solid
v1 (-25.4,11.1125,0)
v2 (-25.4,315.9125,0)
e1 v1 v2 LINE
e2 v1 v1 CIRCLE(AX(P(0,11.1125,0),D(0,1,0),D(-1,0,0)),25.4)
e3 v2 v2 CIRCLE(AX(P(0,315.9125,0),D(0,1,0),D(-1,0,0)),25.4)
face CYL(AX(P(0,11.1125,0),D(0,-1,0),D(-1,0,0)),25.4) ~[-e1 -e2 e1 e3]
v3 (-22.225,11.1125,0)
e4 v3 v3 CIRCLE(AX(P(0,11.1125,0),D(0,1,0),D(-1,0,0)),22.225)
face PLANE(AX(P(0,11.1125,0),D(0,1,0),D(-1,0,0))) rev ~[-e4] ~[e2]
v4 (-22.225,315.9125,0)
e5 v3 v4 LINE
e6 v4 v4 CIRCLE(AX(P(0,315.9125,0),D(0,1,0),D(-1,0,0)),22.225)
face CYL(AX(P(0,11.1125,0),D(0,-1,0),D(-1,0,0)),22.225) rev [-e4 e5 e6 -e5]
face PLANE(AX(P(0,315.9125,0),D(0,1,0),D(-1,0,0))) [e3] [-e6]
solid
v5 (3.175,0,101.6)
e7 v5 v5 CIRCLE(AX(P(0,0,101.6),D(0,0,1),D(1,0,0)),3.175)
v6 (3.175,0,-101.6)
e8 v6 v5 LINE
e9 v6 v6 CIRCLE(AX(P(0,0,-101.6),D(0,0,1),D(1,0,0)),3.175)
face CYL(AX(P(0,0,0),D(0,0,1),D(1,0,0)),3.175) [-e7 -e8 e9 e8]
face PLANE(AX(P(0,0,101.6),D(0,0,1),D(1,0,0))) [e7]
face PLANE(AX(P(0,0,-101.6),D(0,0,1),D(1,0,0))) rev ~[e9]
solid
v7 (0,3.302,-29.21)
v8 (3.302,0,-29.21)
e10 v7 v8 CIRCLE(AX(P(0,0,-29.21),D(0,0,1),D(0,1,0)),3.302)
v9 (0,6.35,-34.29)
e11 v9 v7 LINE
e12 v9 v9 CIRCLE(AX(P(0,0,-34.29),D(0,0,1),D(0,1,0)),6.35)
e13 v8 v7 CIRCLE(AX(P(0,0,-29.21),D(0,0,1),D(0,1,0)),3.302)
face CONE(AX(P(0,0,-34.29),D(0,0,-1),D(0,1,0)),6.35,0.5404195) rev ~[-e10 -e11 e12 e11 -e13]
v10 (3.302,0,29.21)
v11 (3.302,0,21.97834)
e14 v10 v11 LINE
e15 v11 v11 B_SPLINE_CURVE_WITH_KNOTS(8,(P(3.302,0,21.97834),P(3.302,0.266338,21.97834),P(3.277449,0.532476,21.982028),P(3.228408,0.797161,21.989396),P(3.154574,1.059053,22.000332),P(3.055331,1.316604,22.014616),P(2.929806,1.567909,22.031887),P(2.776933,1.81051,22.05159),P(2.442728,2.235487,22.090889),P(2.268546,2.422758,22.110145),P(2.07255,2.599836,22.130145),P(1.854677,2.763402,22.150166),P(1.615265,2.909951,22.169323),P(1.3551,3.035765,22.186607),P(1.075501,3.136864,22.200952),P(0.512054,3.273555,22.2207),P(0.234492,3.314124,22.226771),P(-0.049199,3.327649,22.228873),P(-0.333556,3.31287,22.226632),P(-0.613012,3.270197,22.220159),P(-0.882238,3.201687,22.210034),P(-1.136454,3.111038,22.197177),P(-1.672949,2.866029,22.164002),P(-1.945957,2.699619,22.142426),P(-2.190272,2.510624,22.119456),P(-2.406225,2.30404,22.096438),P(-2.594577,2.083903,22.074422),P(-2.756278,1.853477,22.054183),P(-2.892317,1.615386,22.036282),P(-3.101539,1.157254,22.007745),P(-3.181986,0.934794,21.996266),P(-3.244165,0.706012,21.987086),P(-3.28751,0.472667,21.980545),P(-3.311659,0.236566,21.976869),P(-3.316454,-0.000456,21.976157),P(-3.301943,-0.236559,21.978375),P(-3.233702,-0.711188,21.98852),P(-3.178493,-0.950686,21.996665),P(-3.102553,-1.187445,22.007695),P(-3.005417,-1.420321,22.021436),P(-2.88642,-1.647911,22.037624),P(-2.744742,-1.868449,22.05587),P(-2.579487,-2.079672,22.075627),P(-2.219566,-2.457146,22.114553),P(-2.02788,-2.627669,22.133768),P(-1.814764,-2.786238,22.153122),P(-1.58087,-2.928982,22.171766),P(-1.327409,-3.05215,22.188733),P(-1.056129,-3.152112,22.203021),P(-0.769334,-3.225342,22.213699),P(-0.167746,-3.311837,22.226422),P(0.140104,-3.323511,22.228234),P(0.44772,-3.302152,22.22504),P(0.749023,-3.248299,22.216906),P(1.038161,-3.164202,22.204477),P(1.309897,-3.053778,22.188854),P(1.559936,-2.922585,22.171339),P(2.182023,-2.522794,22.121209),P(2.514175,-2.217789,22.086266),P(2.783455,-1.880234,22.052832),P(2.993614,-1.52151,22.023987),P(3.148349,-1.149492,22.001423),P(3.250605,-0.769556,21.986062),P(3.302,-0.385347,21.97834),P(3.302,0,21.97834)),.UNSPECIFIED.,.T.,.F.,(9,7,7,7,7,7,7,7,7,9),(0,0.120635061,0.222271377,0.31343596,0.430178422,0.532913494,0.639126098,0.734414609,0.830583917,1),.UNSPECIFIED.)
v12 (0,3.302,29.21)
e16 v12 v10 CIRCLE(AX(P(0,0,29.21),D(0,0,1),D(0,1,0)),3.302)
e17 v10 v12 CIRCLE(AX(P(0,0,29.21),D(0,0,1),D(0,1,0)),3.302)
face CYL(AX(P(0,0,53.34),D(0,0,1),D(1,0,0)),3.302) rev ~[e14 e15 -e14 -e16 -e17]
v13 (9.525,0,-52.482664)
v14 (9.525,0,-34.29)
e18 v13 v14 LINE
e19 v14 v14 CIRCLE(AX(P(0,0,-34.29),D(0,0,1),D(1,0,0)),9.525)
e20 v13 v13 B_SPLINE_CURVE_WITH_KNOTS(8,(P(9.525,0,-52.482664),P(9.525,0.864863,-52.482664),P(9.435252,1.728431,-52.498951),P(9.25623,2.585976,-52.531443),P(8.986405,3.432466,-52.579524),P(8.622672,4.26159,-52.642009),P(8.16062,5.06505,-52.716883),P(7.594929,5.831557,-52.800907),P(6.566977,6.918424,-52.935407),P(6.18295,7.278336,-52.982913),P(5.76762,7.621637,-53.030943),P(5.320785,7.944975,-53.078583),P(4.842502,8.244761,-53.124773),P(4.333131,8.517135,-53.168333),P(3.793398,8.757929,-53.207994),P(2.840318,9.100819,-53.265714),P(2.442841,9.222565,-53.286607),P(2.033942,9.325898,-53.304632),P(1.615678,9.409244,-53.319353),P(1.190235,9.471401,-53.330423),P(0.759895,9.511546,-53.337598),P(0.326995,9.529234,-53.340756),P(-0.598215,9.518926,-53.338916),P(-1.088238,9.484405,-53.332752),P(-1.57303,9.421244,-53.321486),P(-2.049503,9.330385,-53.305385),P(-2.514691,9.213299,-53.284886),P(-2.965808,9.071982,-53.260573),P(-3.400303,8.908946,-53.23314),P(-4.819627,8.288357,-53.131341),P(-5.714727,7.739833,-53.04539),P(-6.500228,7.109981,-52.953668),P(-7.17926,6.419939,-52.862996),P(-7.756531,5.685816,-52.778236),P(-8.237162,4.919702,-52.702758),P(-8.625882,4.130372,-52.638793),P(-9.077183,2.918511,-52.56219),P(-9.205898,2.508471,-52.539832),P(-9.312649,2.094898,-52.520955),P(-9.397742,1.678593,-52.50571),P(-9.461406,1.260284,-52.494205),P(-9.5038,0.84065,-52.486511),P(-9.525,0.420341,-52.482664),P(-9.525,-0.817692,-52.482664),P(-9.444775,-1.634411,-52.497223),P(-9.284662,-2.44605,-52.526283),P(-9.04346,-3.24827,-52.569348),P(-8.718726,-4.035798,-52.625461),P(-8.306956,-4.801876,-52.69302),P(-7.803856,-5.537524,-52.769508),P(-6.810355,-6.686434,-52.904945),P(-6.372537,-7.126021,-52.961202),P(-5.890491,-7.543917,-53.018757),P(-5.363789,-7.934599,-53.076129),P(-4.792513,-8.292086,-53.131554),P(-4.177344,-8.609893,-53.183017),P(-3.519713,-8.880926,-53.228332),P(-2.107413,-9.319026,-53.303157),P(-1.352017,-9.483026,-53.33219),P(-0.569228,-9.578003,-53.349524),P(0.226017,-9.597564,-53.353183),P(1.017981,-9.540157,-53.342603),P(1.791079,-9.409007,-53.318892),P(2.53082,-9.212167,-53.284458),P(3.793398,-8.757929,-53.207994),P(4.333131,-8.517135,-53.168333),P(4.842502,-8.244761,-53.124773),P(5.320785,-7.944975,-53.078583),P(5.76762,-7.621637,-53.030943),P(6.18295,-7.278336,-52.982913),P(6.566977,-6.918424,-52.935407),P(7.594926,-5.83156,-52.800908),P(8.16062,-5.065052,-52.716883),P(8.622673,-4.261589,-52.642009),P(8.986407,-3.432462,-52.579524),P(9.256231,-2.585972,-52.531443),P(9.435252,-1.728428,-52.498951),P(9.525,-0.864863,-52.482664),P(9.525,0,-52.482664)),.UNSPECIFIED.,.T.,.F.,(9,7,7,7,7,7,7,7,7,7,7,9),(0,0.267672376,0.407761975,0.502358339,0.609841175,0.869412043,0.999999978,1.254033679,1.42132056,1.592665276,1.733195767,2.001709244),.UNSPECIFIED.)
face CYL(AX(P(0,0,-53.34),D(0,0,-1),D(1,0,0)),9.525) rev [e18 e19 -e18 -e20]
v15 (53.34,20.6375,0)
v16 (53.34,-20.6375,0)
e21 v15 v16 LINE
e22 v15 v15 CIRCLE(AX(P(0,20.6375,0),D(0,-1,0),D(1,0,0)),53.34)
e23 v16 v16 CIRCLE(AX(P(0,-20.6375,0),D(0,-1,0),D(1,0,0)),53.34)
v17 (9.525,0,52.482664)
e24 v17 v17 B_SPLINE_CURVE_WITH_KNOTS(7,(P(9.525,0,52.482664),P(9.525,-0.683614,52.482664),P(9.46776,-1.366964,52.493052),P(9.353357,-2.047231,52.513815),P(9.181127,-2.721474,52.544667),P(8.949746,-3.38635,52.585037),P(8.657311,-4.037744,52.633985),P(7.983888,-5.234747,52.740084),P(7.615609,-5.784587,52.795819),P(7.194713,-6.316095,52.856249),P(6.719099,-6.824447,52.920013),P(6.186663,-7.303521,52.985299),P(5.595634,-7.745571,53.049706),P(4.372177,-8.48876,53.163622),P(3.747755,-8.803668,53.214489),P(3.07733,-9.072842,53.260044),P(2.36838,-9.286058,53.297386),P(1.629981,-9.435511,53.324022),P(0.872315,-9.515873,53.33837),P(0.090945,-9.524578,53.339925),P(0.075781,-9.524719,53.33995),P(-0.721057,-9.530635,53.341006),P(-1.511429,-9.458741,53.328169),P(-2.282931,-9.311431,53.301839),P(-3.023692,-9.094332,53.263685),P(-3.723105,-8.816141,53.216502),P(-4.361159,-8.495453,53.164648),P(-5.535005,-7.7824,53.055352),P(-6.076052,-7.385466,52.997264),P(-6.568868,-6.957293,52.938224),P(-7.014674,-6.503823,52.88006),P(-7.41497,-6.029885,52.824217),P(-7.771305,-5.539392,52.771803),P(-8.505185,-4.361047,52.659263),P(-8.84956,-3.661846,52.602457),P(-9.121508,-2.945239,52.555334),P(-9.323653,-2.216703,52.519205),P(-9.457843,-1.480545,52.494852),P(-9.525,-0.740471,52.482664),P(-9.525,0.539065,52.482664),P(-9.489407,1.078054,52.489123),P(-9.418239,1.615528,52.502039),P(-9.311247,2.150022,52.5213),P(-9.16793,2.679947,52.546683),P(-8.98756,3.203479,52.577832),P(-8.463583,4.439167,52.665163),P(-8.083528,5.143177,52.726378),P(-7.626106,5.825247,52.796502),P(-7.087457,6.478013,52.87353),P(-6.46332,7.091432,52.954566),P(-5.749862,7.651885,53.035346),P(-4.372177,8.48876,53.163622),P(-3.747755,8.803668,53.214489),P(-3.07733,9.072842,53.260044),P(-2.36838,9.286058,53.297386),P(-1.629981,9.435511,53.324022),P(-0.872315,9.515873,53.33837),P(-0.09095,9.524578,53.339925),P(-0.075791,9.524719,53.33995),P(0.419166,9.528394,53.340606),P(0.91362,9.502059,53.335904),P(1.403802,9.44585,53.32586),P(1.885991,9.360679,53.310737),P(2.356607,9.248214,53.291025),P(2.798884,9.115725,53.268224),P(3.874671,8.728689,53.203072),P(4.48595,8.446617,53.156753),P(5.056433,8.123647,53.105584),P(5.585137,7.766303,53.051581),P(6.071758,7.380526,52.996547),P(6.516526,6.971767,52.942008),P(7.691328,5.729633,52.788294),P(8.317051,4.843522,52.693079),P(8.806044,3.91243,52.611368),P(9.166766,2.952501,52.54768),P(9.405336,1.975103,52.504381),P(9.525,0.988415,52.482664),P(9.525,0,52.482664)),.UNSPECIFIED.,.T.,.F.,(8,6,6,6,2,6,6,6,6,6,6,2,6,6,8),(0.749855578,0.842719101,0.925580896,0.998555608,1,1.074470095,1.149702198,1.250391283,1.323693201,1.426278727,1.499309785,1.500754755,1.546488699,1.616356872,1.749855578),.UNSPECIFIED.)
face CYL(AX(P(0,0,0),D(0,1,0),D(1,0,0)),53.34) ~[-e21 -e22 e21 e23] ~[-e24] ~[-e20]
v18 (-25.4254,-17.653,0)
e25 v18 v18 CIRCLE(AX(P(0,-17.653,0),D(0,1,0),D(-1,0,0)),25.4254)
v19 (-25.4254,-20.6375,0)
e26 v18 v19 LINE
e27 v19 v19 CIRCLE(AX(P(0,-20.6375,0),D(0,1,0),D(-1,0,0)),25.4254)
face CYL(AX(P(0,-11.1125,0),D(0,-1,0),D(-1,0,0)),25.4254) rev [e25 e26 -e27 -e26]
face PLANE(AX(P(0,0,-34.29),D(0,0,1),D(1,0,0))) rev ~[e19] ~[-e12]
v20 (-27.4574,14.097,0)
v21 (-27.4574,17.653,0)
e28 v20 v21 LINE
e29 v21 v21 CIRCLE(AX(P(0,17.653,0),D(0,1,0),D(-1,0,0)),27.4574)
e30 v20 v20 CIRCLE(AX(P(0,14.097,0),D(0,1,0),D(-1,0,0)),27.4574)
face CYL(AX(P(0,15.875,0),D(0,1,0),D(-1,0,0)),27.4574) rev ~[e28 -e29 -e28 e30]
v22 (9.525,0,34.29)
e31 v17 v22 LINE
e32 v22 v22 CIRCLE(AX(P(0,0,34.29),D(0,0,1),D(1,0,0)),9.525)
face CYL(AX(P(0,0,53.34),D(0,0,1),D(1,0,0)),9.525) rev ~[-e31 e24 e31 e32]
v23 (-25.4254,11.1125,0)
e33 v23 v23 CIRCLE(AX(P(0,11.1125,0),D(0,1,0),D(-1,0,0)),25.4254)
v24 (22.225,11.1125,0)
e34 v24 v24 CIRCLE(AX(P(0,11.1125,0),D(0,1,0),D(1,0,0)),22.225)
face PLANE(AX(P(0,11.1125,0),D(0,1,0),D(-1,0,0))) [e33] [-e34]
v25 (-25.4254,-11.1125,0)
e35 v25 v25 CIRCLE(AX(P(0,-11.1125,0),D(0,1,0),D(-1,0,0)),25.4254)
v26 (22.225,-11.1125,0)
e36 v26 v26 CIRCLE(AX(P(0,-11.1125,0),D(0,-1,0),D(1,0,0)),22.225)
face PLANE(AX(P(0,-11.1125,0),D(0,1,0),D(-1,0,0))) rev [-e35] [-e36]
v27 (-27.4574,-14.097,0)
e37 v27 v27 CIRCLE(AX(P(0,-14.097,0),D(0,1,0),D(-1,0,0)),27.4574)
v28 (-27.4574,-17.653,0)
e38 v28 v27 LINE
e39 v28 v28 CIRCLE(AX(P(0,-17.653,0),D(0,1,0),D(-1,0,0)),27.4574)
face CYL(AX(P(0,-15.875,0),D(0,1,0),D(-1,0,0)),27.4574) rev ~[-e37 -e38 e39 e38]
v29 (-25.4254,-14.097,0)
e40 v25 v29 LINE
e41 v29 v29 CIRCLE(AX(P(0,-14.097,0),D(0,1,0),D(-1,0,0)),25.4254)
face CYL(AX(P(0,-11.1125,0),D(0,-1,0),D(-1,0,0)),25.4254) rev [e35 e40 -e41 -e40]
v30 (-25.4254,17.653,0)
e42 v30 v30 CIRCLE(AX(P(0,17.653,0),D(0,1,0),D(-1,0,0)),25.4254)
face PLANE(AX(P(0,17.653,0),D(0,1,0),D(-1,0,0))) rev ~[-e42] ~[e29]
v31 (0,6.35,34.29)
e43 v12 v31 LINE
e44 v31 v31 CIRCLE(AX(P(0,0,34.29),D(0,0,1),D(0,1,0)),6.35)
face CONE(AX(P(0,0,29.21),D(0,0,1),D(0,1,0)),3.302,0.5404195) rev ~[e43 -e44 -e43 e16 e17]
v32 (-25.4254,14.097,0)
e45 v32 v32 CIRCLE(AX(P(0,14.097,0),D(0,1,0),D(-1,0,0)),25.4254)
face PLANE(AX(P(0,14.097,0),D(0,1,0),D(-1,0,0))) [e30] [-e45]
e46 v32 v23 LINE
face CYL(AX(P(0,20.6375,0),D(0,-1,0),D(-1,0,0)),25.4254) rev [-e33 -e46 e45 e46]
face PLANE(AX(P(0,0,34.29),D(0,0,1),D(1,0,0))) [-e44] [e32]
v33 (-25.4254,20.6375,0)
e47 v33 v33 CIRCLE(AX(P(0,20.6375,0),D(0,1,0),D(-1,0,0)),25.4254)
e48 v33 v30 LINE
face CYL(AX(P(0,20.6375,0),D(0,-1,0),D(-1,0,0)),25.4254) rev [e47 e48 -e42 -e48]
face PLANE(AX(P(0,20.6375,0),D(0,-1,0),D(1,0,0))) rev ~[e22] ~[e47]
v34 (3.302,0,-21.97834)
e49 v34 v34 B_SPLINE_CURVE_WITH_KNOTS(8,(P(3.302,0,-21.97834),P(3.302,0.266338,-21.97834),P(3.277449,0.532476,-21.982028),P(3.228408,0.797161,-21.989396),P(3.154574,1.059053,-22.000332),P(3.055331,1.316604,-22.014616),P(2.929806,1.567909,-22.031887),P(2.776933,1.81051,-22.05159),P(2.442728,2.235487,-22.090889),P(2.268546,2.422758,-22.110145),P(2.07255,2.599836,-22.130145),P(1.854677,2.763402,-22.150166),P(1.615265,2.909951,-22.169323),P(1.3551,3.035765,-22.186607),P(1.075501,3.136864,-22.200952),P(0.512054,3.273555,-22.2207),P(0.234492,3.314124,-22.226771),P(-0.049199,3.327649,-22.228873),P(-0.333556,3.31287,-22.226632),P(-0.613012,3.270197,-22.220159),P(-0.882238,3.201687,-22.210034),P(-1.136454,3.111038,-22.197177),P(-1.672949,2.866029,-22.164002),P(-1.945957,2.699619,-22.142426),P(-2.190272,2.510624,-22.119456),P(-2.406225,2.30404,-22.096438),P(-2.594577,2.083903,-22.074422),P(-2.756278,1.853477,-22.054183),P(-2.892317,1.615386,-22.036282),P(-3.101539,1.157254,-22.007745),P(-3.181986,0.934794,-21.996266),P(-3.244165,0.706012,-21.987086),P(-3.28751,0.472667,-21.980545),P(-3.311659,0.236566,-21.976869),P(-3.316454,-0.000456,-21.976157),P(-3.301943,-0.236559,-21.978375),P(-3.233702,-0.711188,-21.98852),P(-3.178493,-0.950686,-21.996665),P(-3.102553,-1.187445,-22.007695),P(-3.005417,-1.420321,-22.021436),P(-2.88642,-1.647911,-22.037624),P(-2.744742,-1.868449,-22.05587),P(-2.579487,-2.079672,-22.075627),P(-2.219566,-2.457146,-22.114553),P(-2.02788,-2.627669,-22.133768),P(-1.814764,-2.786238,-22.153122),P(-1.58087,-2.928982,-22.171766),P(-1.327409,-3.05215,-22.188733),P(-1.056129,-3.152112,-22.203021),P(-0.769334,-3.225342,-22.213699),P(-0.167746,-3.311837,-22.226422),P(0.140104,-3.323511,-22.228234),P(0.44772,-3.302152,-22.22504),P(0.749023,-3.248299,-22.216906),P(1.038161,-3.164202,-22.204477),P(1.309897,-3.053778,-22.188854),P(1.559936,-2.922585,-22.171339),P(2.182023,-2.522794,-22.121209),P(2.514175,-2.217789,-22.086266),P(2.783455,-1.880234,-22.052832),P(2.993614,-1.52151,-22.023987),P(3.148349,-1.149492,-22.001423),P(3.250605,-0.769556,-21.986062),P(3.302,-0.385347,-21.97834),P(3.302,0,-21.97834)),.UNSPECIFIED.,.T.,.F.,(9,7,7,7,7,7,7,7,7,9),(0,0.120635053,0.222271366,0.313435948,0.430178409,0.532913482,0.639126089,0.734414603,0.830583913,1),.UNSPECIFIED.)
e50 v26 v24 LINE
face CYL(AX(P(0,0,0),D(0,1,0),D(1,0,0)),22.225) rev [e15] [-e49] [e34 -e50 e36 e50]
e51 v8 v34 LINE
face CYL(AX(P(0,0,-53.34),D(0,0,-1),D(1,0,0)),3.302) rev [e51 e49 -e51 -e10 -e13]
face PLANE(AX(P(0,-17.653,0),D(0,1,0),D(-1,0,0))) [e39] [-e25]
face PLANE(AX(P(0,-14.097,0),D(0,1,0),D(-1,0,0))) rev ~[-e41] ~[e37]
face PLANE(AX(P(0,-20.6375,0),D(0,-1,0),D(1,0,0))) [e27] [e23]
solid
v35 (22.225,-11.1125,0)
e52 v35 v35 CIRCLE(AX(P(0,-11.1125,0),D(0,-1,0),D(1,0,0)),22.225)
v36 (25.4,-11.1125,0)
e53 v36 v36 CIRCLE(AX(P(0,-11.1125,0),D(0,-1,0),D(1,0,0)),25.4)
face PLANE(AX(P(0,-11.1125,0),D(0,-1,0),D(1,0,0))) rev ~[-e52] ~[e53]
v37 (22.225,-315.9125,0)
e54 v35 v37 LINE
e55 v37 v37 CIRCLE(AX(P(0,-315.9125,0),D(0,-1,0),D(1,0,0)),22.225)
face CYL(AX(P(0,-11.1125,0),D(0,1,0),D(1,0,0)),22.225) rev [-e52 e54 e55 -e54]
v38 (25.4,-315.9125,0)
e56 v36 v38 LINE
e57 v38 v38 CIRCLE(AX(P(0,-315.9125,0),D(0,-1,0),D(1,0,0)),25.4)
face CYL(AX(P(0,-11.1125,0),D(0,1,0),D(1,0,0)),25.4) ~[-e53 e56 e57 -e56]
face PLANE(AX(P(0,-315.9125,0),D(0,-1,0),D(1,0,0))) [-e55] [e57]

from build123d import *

# Parameters (mm, degrees)
F0_R      = 53.34
F0_R_2    = 22.225
F1_DEPTH  = 20.6375
F6_DEPTH  = 20.6375
F5_R      = 9.525
F5_R_2    = 3.302
F7_DEPTH  = 19.05
F8_DEPTH  = 32.3616602869
F4_R      = 9.525
F4_R_2    = 3.302
F9_DEPTH  = 19.05
F10_DEPTH = 32.3616602869
F13_W     = 2.032
F13_H     = 3.556
F15_R     = 3.175
F16_DEPTH = 101.6
F19_R     = 25.4
F19_R_2   = 22.225
F20_DEPTH = 304.8
F21_R     = 25.4
F21_R_2   = 22.225
F22_DEPTH = 304.8


# Not quite as in the source:
# - the program builds the solid bodies; features that only make, move or delete a surface that nothing else refers to are left out


with BuildPart() as f1:
    # F0 (on Front) → F1 (new body)
    with BuildSketch(Plane.XZ):
        Circle(F0_R)
        Circle(F0_R_2, mode=Mode.SUBTRACT)
    extrude(amount=-F1_DEPTH)

    # F0 (on Front) → F6 (join)
    with BuildSketch(Plane.XZ):
        Circle(F0_R)
        Circle(F0_R_2, mode=Mode.SUBTRACT)
    extrude(amount=F6_DEPTH)

    # F5 (on offset) → F7 (cut)
    with BuildSketch(Plane.XY.offset(-53.34)):
        Circle(F5_R)
        Circle(F5_R_2, mode=Mode.SUBTRACT)
        Circle(F5_R_2)
    extrude(amount=F7_DEPTH, mode=Mode.SUBTRACT)

    # F5 (on offset) → F8 (cut, up to face)
    with BuildSketch(Plane.XY.offset(-53.34)):
        Circle(F5_R_2)
    extrude(amount=F8_DEPTH, mode=Mode.SUBTRACT)

    # F4 (on offset) → F9 (cut)
    with BuildSketch(Plane.XY.offset(53.34)):
        Circle(F4_R)
        Circle(F4_R_2, mode=Mode.SUBTRACT)
        Circle(F4_R_2)
    extrude(amount=-F9_DEPTH, mode=Mode.SUBTRACT)

    # F4 (on offset) → F10 (cut, up to face)
    with BuildSketch(Plane.XY.offset(53.34)):
        Circle(F4_R_2)
    extrude(amount=-F10_DEPTH, mode=Mode.SUBTRACT)

    # F11 (on Right) → F12 (revolve, cut)
    with BuildSketch(Plane.YZ):
        Polygon((6.35, 34.29), (3.302, 34.29), (3.302, 29.21), align=None)
        Polygon((3.302, -29.21), (3.302, -34.29), (6.35, -34.29), align=None)
    revolve(axis=Axis((0, 0, 6.9711627439), (0, 0, 1)), mode=Mode.SUBTRACT)

    # F13 (on Top) → F14 (revolve, cut)
    with BuildSketch(Plane.XY):
        Polygon((-25.4254, 11.1125), (-22.225, 11.1125), (-22.225, 20.6375), (-25.4254, 20.6375), (-25.4254, 17.653), (-25.4254, 14.097), align=None)
        Polygon((-22.225, -20.6375), (-22.225, -11.1125), (-25.4254, -11.1125), (-25.4254, -14.097), (-25.4254, -17.653), (-25.4254, -20.6375), align=None)
        with Locations((-26.4414, 15.875)):
            Rectangle(F13_W, F13_H)
        with Locations((-26.4414, -15.875)):
            Rectangle(F13_W, F13_H)
    revolve(axis=Axis((0, 5.55625, 0), (0, 1, 0)), mode=Mode.SUBTRACT)


with BuildPart() as f16:
    # F15 (on Top) → F16 (new body, symmetric)
    with BuildSketch(Plane.XY):
        Circle(F15_R)
    extrude(amount=F16_DEPTH, both=True)


with BuildPart() as f20:
    # F19 (on face) → F20 (new body)
    with BuildSketch(Plane.XZ.offset(11.1125)):
        Circle(F19_R)
        Circle(F19_R_2, mode=Mode.SUBTRACT)
    extrude(amount=F20_DEPTH)


with BuildPart() as f22:
    # F21 (on face) → F22 (new body)
    with BuildSketch(Plane(origin=(0, 11.1125, 0), x_dir=(-1, 0, 0), z_dir=(0, 1, 0))):
        Circle(F21_R)
        Circle(F21_R_2, mode=Mode.SUBTRACT)
    extrude(amount=F22_DEPTH)


solid = Compound([f1.part, f16.part, f20.part, f22.part])
